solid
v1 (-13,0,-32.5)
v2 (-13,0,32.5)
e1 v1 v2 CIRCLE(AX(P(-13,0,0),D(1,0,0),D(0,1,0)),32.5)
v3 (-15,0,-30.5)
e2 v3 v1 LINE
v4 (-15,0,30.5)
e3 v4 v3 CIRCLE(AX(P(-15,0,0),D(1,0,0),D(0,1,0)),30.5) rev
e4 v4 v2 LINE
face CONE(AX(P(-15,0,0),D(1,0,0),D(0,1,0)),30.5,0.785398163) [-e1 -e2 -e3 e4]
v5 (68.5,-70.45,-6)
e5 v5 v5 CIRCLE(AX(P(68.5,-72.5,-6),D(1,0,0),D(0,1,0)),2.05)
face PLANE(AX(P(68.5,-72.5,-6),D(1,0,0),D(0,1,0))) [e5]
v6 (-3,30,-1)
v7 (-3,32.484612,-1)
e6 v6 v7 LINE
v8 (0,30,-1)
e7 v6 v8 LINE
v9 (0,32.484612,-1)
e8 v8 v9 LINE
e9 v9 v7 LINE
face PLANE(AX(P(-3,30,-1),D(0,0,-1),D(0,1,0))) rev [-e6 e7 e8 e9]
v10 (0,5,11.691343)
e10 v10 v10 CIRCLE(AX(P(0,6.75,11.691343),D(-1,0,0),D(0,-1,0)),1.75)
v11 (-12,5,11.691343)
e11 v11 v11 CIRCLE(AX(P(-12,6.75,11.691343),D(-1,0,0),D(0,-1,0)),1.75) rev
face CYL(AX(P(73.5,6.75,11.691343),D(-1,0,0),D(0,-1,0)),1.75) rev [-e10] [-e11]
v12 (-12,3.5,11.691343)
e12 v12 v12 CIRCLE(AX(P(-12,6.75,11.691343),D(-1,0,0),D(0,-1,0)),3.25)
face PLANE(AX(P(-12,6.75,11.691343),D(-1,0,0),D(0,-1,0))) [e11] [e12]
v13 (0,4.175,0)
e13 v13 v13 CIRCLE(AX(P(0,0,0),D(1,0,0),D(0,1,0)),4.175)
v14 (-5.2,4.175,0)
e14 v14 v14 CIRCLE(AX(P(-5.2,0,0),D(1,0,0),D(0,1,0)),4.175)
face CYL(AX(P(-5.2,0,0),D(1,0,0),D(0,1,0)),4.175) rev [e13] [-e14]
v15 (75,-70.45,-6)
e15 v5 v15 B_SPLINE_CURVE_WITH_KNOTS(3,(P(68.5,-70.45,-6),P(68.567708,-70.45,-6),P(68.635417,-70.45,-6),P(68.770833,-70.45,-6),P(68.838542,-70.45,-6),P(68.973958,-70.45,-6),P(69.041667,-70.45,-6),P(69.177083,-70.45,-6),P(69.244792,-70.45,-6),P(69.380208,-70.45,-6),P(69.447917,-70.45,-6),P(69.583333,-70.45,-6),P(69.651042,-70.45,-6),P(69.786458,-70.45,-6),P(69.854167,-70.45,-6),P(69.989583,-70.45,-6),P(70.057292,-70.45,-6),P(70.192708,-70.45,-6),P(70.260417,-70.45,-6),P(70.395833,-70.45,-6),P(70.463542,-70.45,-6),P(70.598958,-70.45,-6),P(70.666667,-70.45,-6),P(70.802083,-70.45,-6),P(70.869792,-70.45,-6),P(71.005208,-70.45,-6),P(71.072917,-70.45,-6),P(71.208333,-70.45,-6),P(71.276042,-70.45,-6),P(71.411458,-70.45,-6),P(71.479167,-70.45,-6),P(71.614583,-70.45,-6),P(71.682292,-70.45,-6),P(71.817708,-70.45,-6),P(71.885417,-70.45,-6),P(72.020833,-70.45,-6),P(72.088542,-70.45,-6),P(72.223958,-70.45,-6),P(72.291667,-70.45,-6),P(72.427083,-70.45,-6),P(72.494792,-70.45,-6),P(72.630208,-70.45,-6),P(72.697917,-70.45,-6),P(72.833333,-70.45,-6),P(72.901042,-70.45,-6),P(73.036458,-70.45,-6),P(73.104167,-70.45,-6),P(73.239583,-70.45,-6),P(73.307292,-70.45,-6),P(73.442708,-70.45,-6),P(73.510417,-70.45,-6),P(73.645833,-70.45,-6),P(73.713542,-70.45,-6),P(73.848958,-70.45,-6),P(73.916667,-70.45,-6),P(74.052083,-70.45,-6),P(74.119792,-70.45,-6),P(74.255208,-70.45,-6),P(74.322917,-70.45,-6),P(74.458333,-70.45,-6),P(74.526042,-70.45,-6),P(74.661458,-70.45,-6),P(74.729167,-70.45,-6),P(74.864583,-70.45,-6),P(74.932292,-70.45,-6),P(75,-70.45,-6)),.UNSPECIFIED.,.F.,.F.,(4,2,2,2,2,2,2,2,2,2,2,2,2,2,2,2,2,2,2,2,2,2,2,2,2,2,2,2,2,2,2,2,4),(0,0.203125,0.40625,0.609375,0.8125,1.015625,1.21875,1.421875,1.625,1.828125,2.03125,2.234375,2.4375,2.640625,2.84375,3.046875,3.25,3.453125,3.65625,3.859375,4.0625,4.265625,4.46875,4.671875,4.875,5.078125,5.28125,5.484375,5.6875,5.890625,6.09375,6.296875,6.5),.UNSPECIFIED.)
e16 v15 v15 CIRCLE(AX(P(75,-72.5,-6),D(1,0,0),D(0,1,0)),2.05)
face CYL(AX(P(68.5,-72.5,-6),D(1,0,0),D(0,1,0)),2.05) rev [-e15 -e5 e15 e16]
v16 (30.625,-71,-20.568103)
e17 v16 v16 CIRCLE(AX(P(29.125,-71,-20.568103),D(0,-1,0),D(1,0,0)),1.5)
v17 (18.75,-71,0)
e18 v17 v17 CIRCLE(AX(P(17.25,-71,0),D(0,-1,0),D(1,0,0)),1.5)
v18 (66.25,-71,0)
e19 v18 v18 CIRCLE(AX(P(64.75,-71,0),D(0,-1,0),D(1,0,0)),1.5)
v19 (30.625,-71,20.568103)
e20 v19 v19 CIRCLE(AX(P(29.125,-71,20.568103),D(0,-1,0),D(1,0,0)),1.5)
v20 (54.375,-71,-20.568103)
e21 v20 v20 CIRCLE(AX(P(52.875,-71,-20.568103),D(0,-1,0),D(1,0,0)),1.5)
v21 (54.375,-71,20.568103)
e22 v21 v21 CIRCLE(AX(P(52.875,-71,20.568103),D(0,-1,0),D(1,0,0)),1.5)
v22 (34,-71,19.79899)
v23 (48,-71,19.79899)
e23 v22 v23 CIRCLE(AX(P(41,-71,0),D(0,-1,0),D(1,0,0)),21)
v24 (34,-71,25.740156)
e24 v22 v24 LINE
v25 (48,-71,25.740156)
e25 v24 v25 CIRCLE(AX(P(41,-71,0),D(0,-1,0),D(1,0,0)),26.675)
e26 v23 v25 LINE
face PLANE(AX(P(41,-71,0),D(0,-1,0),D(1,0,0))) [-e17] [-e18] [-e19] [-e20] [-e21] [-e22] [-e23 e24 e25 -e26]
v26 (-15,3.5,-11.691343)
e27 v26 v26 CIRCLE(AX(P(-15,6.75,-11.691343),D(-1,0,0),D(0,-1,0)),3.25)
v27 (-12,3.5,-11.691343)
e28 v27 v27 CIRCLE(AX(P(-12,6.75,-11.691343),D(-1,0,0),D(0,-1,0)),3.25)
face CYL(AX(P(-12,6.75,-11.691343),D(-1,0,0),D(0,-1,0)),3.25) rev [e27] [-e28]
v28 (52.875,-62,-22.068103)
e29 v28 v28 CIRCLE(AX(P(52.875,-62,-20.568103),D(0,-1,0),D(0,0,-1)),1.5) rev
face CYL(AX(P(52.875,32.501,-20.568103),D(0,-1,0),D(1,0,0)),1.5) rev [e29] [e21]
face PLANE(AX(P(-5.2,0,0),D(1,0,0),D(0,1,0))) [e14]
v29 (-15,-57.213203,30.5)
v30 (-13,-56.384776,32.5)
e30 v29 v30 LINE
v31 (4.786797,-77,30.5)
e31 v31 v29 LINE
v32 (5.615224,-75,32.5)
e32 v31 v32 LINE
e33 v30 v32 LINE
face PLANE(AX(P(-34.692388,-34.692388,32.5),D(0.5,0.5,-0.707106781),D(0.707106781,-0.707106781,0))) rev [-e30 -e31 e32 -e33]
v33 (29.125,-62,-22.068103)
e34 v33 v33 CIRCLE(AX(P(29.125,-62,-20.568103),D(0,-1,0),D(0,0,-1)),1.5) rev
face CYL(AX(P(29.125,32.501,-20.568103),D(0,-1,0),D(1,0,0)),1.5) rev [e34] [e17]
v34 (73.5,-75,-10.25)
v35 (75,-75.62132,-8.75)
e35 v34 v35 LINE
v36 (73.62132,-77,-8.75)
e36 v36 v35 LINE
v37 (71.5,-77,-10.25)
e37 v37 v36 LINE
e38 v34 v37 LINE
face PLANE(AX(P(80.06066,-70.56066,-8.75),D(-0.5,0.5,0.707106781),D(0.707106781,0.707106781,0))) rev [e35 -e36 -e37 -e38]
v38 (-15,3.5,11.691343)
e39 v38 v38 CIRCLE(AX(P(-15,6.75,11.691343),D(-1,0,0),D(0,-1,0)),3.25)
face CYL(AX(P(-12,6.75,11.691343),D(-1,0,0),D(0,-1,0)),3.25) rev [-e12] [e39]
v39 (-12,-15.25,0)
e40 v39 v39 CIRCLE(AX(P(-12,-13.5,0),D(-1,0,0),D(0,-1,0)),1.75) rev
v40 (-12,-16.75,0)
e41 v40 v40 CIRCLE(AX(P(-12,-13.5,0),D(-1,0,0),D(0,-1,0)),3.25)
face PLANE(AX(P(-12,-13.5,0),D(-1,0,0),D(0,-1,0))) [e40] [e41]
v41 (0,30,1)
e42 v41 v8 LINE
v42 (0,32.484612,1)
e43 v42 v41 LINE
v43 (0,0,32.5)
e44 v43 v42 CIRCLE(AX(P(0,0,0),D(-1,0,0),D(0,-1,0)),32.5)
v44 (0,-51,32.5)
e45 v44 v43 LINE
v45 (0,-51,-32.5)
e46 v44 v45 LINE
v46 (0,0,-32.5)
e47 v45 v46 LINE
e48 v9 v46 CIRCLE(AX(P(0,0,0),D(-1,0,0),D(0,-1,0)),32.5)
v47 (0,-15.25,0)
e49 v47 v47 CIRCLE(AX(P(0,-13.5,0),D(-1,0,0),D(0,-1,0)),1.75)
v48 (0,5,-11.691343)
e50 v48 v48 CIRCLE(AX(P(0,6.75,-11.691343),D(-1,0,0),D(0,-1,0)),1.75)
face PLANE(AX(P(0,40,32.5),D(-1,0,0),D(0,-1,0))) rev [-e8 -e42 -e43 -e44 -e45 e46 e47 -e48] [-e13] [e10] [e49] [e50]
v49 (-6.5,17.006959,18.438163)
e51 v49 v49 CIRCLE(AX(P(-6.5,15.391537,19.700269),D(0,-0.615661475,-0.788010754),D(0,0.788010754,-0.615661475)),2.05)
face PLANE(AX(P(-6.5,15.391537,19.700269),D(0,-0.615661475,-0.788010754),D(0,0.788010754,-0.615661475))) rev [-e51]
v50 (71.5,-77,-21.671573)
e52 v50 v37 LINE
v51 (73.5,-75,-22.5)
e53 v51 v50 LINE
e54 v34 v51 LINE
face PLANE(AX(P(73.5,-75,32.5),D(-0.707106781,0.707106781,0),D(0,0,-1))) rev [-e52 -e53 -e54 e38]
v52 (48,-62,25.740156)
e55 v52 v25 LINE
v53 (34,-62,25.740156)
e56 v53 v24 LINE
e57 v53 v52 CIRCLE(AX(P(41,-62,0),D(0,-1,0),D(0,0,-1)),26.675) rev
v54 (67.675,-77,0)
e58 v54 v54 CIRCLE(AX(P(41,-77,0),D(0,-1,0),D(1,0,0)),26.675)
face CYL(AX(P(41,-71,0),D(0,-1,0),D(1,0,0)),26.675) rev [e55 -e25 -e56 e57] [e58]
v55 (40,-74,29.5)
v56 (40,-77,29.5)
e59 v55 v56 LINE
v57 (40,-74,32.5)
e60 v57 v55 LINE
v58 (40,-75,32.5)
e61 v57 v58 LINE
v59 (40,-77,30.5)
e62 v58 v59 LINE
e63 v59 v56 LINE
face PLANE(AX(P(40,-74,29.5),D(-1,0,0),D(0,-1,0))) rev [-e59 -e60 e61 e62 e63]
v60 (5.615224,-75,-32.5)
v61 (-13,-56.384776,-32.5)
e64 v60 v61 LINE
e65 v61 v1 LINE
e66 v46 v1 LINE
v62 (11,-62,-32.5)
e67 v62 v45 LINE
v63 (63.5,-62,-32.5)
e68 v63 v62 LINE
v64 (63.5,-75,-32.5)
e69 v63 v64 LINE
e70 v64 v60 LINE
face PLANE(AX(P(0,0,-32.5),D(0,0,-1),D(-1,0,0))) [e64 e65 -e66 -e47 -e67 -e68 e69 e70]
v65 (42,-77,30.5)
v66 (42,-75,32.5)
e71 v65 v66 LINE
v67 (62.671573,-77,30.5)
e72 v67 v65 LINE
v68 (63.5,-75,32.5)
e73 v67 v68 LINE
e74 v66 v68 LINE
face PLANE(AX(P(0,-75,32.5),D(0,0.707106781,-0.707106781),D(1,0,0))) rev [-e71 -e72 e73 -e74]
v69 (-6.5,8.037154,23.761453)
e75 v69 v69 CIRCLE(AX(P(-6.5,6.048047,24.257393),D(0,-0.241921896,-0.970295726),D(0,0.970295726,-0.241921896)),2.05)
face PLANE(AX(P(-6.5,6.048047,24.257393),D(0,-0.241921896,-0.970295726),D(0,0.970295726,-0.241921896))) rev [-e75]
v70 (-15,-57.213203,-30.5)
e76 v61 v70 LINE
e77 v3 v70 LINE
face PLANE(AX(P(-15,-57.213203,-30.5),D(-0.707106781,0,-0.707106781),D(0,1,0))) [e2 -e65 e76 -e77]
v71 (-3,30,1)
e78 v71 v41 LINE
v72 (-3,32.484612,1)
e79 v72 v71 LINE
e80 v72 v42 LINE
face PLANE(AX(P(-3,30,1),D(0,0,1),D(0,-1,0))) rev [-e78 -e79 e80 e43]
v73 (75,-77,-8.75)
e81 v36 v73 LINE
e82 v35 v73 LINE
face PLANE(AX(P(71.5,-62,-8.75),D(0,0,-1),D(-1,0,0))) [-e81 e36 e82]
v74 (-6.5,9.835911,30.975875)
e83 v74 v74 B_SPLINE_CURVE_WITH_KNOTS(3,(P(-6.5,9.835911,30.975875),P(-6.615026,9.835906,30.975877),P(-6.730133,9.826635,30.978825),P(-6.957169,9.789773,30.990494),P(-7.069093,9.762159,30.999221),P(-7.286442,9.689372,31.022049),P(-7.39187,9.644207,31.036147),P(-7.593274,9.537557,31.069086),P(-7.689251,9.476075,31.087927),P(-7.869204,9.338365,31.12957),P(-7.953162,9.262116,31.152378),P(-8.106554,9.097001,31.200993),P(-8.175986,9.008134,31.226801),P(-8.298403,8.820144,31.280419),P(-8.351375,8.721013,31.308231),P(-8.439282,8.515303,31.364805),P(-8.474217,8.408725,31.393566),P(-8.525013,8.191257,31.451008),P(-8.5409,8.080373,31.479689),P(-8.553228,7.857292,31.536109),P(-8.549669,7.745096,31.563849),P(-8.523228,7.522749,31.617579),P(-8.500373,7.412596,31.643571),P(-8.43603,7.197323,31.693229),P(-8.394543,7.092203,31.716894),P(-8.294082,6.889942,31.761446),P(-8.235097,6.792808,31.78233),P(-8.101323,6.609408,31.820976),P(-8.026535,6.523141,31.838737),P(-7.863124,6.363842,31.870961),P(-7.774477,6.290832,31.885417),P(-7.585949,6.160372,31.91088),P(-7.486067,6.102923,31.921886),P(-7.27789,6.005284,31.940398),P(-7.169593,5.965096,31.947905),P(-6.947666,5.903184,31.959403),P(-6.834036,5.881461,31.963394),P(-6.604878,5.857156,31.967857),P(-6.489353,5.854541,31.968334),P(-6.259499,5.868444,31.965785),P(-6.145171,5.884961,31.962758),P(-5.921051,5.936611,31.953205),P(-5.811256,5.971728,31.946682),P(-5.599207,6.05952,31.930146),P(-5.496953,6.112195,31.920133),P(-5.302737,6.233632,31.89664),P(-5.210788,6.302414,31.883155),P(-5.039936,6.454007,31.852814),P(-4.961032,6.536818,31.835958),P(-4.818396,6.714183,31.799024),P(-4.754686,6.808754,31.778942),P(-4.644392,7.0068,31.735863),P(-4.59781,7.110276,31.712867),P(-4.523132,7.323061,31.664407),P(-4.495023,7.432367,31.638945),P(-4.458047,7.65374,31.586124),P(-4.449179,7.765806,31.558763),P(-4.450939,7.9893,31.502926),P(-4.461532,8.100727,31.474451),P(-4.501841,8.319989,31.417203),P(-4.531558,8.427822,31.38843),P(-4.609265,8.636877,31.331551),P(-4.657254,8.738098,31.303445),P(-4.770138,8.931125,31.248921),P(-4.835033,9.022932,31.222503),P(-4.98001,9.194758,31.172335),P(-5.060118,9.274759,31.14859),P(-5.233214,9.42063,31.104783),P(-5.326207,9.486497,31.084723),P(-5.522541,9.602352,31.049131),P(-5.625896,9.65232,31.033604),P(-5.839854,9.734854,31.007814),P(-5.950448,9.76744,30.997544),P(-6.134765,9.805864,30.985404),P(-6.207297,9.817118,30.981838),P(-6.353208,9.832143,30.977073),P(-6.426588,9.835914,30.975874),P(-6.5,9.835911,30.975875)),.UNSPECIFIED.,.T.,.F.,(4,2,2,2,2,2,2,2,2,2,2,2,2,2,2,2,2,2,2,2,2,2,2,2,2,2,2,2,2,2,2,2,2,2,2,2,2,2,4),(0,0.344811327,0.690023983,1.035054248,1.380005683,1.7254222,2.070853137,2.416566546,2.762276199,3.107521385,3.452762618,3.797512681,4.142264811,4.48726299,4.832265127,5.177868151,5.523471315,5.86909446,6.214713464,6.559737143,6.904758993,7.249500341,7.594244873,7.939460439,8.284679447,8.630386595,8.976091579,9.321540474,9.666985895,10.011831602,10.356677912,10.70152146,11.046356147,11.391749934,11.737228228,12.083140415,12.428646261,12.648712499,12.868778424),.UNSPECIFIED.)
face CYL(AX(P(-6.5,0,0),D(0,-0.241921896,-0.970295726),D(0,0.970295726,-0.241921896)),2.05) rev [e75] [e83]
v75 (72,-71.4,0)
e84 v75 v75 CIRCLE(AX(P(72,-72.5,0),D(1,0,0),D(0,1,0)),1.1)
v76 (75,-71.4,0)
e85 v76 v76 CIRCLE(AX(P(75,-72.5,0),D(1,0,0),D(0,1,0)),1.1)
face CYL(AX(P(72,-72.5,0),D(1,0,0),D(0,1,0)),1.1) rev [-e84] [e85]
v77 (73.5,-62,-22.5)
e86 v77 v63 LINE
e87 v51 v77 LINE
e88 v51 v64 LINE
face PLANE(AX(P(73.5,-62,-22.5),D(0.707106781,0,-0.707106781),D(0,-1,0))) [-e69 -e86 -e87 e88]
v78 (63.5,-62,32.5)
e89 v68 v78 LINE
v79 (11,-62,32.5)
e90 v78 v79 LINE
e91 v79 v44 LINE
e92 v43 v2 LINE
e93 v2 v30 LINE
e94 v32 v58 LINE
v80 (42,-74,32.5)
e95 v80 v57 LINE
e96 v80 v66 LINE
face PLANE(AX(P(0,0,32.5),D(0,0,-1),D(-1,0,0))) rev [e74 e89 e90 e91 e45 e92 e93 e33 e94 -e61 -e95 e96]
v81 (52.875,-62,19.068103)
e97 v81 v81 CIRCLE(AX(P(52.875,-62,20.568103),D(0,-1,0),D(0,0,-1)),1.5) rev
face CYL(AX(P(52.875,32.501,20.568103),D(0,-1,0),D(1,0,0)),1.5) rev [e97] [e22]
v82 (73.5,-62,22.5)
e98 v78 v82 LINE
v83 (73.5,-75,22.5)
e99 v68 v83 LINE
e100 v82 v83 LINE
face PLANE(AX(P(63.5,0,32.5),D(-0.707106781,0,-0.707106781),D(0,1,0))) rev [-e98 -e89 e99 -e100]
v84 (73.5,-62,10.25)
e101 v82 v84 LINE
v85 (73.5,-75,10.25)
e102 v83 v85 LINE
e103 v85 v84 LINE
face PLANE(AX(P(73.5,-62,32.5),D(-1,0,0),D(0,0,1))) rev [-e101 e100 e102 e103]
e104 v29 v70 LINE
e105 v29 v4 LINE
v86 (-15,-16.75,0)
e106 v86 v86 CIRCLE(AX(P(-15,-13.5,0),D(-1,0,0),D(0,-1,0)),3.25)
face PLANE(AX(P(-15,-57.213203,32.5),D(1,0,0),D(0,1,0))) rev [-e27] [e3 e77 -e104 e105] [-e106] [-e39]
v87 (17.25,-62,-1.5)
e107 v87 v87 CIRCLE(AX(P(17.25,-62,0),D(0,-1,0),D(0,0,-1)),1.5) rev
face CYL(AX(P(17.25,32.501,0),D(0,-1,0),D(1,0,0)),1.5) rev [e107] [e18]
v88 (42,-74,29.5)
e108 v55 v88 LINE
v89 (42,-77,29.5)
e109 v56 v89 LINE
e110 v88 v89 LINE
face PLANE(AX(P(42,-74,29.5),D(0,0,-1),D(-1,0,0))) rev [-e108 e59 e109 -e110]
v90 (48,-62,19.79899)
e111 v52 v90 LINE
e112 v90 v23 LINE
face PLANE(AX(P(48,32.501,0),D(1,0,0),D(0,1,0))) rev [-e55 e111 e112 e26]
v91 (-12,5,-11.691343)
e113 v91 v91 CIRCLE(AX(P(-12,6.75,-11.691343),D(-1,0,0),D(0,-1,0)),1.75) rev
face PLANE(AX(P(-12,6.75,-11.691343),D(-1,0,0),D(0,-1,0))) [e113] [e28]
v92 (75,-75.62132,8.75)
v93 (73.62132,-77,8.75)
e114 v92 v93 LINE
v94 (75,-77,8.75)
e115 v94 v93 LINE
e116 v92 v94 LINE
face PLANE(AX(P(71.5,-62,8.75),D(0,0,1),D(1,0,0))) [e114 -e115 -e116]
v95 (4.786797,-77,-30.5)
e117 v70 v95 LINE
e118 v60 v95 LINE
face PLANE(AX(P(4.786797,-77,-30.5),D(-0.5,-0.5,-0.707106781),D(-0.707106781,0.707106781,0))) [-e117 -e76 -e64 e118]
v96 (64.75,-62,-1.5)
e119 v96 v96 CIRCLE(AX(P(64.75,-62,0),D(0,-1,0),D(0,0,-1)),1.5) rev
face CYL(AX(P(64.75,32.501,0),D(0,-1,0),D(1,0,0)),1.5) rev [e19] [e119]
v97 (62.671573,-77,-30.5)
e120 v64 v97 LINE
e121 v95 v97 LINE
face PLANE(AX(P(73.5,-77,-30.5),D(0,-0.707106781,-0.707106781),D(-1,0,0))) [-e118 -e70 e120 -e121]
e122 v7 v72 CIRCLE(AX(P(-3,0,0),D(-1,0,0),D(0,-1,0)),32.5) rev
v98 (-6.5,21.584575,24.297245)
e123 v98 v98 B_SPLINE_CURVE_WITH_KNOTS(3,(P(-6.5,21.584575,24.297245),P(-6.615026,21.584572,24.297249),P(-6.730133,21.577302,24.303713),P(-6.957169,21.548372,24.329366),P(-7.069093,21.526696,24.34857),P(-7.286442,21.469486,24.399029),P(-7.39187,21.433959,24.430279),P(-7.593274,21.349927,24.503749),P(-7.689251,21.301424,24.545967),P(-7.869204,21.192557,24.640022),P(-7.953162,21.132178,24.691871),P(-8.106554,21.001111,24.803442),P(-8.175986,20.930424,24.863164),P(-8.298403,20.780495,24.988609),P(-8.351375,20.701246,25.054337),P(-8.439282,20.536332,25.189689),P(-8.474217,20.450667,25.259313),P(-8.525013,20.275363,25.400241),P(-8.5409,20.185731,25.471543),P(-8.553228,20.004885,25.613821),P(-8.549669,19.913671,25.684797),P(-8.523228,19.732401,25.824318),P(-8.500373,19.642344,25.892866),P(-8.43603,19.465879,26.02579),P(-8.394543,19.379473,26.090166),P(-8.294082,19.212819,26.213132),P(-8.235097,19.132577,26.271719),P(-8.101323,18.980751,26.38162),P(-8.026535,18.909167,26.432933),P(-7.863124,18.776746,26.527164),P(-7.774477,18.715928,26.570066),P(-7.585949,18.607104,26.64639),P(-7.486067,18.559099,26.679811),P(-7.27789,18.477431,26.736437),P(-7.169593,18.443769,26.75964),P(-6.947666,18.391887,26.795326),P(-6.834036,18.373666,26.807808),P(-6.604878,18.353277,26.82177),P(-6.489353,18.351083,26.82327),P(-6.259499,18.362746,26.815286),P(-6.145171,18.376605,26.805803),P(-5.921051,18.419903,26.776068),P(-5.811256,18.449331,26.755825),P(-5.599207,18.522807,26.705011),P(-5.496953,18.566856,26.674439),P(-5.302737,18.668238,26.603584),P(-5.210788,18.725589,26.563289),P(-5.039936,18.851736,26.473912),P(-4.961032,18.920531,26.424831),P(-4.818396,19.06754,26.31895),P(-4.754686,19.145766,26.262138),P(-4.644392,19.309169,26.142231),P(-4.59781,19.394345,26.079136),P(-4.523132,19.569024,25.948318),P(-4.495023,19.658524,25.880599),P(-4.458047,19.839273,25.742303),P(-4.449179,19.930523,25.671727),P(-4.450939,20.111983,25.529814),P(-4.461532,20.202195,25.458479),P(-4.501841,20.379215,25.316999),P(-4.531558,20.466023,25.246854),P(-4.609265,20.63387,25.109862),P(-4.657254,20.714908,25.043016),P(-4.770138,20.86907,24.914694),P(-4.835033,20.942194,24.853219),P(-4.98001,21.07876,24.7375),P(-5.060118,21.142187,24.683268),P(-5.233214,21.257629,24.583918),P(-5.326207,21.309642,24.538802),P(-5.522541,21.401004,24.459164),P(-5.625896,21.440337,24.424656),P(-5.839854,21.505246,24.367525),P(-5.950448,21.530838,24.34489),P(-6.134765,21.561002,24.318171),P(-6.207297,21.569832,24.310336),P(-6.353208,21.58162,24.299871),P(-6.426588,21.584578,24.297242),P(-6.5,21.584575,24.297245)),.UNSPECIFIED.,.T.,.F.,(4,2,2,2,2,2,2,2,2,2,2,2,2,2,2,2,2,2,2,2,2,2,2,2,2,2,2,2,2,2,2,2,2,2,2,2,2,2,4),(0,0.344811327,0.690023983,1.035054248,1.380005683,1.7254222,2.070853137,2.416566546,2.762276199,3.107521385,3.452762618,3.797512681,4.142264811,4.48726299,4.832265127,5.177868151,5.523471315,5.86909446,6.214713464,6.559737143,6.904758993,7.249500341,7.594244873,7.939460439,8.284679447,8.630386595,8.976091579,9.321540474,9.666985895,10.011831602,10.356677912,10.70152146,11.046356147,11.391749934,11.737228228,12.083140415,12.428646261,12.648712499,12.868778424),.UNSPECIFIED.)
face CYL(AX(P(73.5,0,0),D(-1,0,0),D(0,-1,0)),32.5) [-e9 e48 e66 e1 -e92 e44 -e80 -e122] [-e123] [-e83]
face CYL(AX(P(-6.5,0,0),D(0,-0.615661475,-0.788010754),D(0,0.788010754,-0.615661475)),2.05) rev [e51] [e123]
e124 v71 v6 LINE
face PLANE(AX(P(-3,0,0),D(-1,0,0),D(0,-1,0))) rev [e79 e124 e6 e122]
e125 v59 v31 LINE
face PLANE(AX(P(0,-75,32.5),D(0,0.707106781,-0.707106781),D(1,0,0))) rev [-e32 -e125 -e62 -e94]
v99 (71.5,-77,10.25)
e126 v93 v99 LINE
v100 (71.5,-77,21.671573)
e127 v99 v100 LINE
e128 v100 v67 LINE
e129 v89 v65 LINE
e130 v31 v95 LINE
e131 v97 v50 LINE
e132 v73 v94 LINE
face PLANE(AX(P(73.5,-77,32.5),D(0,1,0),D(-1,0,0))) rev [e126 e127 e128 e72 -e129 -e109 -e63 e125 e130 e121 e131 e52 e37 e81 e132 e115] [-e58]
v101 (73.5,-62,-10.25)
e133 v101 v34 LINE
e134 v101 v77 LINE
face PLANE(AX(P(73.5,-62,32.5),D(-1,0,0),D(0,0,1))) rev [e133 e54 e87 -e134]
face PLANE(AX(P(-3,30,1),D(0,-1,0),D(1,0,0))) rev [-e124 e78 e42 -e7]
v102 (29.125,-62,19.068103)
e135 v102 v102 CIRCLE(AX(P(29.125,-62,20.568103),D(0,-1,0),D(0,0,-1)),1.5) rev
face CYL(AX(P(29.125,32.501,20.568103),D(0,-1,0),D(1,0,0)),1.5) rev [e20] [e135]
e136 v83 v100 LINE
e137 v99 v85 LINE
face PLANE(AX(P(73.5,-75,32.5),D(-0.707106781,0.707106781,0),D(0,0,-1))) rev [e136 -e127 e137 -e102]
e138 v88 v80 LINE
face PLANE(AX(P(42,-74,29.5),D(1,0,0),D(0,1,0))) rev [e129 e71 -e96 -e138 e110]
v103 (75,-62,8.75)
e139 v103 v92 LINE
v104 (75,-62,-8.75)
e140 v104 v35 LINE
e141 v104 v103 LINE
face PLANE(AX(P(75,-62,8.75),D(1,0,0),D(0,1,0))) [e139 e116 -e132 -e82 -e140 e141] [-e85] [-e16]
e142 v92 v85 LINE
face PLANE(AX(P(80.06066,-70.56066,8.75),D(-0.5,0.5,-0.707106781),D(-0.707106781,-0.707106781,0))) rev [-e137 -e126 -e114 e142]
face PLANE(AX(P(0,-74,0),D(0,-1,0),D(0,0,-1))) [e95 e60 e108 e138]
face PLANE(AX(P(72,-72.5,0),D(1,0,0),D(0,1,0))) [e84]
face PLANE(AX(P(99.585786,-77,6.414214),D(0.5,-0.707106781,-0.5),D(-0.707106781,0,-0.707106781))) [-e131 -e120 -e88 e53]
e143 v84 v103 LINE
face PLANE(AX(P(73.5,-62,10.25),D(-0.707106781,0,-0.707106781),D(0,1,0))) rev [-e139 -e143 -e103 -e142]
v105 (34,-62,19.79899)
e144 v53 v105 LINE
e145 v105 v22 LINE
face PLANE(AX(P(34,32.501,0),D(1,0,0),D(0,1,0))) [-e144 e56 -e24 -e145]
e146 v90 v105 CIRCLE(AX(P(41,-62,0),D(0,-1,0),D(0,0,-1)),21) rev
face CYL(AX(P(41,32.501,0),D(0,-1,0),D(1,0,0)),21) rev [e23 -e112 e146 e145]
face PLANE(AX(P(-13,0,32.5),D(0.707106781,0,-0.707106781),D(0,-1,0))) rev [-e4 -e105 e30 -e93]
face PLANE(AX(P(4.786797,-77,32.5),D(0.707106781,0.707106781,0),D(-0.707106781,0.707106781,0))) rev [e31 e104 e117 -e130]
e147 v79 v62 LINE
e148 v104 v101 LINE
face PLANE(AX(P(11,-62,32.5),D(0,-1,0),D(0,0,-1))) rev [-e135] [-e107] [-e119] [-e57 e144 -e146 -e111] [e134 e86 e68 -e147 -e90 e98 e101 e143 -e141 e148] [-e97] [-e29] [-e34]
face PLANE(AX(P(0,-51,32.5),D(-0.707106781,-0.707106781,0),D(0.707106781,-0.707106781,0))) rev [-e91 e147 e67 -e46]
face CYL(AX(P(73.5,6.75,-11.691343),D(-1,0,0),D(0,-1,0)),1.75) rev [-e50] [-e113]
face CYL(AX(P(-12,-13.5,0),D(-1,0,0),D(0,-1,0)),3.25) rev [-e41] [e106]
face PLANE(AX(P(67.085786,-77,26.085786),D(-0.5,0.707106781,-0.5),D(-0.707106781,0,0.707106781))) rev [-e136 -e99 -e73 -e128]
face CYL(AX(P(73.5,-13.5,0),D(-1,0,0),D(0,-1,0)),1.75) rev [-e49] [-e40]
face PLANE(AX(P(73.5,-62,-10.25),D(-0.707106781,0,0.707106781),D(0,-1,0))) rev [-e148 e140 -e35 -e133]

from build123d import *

# Parameters (mm, degrees)
EXTRUDE_1_DEPTH          = 32.5
SKETCH_2_R               = 1.75
CUT_EXTRUDE_1_DEPTH      = 122.727153914
SKETCH_3_R               = 26.675
CUT_EXTRUDE_2_DEPTH      = 6
CUT_EXTRUDE_3_REACH      = 133.037
SKETCH_4_R               = 1.5
SKETCH_4_R_2             = 21
SKETCH_5_R               = 4.175
CUT_EXTRUDE_4_DEPTH      = 5.2
CHAMFER_1_SIZE           = 10
CUT_EXTRUDE_START        = -9
CUT_EXTRUDE_5_DEPTH      = 9
SKETCH_7_R               = 3.25
CUT_EXTRUDE_6_DEPTH      = 3
CHAMFER_2_SIZE           = 2
PATTERN_CIRCULAR_1_COUNT = 2
PATTERN_CIRCULAR_1_ANGLE = 24
SKETCH_10_W              = 2
SKETCH_10_H              = 3
CUT_EXTRUDE_7_DEPTH      = 3
SKETCH_11_W              = 3.5
SKETCH_11_H              = 17.5
EXTRUDE_2_DEPTH          = 15
CHAMFER_3_SIZE           = 1.5
SKETCH_12_R              = 1.1
CUT_EXTRUDE_8_DEPTH      = 3
SKETCH_13_R              = 2.05
CUT_EXTRUDE_9_DEPTH      = 6.5
SKETCH_14_W              = 2
SKETCH_14_H              = 3
CUT_EXTRUDE_10_DEPTH     = 3


with BuildPart() as part:
    # Эскиз1 → Бобышка-Вытянуть1 (new, symmetric)
    with BuildSketch(Plane.XY):
        Polygon((0, 40), (0, -51), (11, -62), (73.5, -62), (73.5, -77), (4.786796564, -77), (-15, -57.213203436), (-15, 40), align=None)
    extrude(amount=EXTRUDE_1_DEPTH, both=True)

    # Эскиз2 → Вырез-Вытянуть1 (cut, through all)
    with BuildSketch(Plane.ZY.offset(15)):
        with BuildLine():
            Line((32.5, 0), (32.5, 40))
            Line((32.5, 40), (-32.5, 40))
            Line((-32.5, 40), (-32.5, 0))
            ThreePointArc((-32.5, 0), (0, 32.5), (32.5, 0))
        make_face()
        with Locations(Location((0, -13.5, 0), (0, 0, 270))):
            Circle(SKETCH_2_R)
        with Locations(Location((11.691342951, 6.75, 0), (0, 0, 270))):
            Circle(SKETCH_2_R)
        with Locations(Location((-11.691342951, 6.75, 0), (0, 0, 270))):
            Circle(SKETCH_2_R)
    extrude(amount=-CUT_EXTRUDE_1_DEPTH, mode=Mode.SUBTRACT)

    # Эскиз3 → Вырез-Вытянуть2 (cut)
    with BuildSketch(Plane.XZ.offset(77)):
        with Locations((41, 0)):
            Circle(SKETCH_3_R)
    extrude(amount=-CUT_EXTRUDE_2_DEPTH, mode=Mode.SUBTRACT)

    # Эскиз4 → Вырез-Вытянуть3 (cut, up to next)
    with BuildSketch(Plane.XZ.offset(71), mode=Mode.PRIVATE) as cut_extrude_3_sk1:
        with Locations((64.75, 0)):
            Circle(SKETCH_4_R)
    cut_extrude_3_tool1 = extrude(cut_extrude_3_sk1.sketch, amount=-CUT_EXTRUDE_3_REACH, mode=Mode.PRIVATE) & part.part
    # Эскиз4 → Вырез-Вытянуть3 (cut, up to next)
    with BuildSketch(Plane.XZ.offset(71), mode=Mode.PRIVATE) as cut_extrude_3_sk2:
        with Locations((52.875, -20.56810334)):
            Circle(SKETCH_4_R)
    cut_extrude_3_tool2 = extrude(cut_extrude_3_sk2.sketch, amount=-CUT_EXTRUDE_3_REACH, mode=Mode.PRIVATE) & part.part
    # Эскиз4 → Вырез-Вытянуть3 (cut, up to next)
    with BuildSketch(Plane.XZ.offset(71), mode=Mode.PRIVATE) as cut_extrude_3_sk3:
        with Locations((29.125, -20.56810334)):
            Circle(SKETCH_4_R)
    cut_extrude_3_tool3 = extrude(cut_extrude_3_sk3.sketch, amount=-CUT_EXTRUDE_3_REACH, mode=Mode.PRIVATE) & part.part
    # Эскиз4 → Вырез-Вытянуть3 (cut, up to next)
    with BuildSketch(Plane.XZ.offset(71), mode=Mode.PRIVATE) as cut_extrude_3_sk4:
        with Locations((17.25, 0)):
            Circle(SKETCH_4_R)
    cut_extrude_3_tool4 = extrude(cut_extrude_3_sk4.sketch, amount=-CUT_EXTRUDE_3_REACH, mode=Mode.PRIVATE) & part.part
    # Эскиз4 → Вырез-Вытянуть3 (cut, up to next)
    with BuildSketch(Plane.XZ.offset(71), mode=Mode.PRIVATE) as cut_extrude_3_sk5:
        with Locations((29.125, 20.56810334)):
            Circle(SKETCH_4_R)
    cut_extrude_3_tool5 = extrude(cut_extrude_3_sk5.sketch, amount=-CUT_EXTRUDE_3_REACH, mode=Mode.PRIVATE) & part.part
    # Эскиз4 → Вырез-Вытянуть3 (cut, up to next)
    with BuildSketch(Plane.XZ.offset(71), mode=Mode.PRIVATE) as cut_extrude_3_sk6:
        with Locations((52.875, 20.56810334)):
            Circle(SKETCH_4_R)
    cut_extrude_3_tool6 = extrude(cut_extrude_3_sk6.sketch, amount=-CUT_EXTRUDE_3_REACH, mode=Mode.PRIVATE) & part.part
    # Эскиз4 → Вырез-Вытянуть3 (cut, up to next)
    with BuildSketch(Plane.XZ.offset(71), mode=Mode.PRIVATE) as cut_extrude_3_sk7:
        with Locations((41, 0)):
            Circle(SKETCH_4_R_2)
    cut_extrude_3_tool7 = extrude(cut_extrude_3_sk7.sketch, amount=-CUT_EXTRUDE_3_REACH, mode=Mode.PRIVATE) & part.part
    add(cut_extrude_3_tool1.solids().sort_by_distance((64.75, -71, 0))[0], mode=Mode.SUBTRACT)
    add(cut_extrude_3_tool2.solids().sort_by_distance((52.875, -71, -20.568103))[0], mode=Mode.SUBTRACT)
    add(cut_extrude_3_tool3.solids().sort_by_distance((29.125, -71, -20.568103))[0], mode=Mode.SUBTRACT)
    add(cut_extrude_3_tool4.solids().sort_by_distance((17.25, -71, 0))[0], mode=Mode.SUBTRACT)
    add(cut_extrude_3_tool5.solids().sort_by_distance((29.125, -71, 20.568103))[0], mode=Mode.SUBTRACT)
    add(cut_extrude_3_tool6.solids().sort_by_distance((52.875, -71, 20.568103))[0], mode=Mode.SUBTRACT)
    add(cut_extrude_3_tool7.solids().sort_by_distance((41, -71, 0))[0], mode=Mode.SUBTRACT)

    # Эскиз5 → Вырез-Вытянуть4 (cut)
    with BuildSketch(Plane(origin=(0, 0, 0), x_dir=(0, 0, -1), z_dir=(1, 0, 0))):
        with Locations(Location((0, 0, 0), (0, 0, 90))):
            Circle(SKETCH_5_R)
    extrude(amount=-CUT_EXTRUDE_4_DEPTH, mode=Mode.SUBTRACT)

    # Фаска1
    chamfer_1_edges = [part.edges().sort_by_distance(p)[0] for p in [
        (73.5, -69.5, 32.5),
        (73.5, -69.5, -32.5),
    ]]
    chamfer(chamfer_1_edges, length=CHAMFER_1_SIZE)

    # Эскиз6 → Вырез-Вытянуть5 (cut)
    with BuildSketch(Plane.XZ.offset(71).offset(CUT_EXTRUDE_START)):
        with BuildLine():
            ThreePointArc((34, 19.798989873), (41, 21), (48, 19.798989873))
            Line((48, 19.798989873), (48, 25.740155885))
            ThreePointArc((48, 25.740155885), (41, 26.675), (34, 25.740155885))
            Line((34, 25.740155885), (34, 19.798989873))
        make_face()
    extrude(amount=CUT_EXTRUDE_5_DEPTH, mode=Mode.SUBTRACT)

    # Эскиз7 → Вырез-Вытянуть6 (cut)
    with BuildSketch(Plane.ZY.offset(15)):
        with Locations(Location((11.691342951, 6.75, 0), (0, 0, 270))):
            Circle(SKETCH_7_R)
        with Locations(Location((0, -13.5, 0), (0, 0, 270))):
            Circle(SKETCH_7_R)
        with Locations(Location((-11.691342951, 6.75, 0), (0, 0, 270))):
            Circle(SKETCH_7_R)
    extrude(amount=-CUT_EXTRUDE_6_DEPTH, mode=Mode.SUBTRACT)

    # Фаска2
    chamfer_2_edges = [part.edges().sort_by_distance(p)[0] for p in [
        (73.5, -77, 0),
        (34.143398282, -77, -32.5),
        (68.5, -77, 27.5),
        (68.5, -77, -27.5),
        (-5.106601718, -67.106601718, -32.5),
        (-5.106601718, -67.106601718, 32.5),
        (34.143398282, -77, 32.5),
        (-15, -28.606601718, -32.5),
        (-15, -28.606601718, 32.5),
        (-15, 32.5, 0),
    ]]
    chamfer(chamfer_2_edges, length=CHAMFER_2_SIZE)

    # Эскиз9 → Вырез-Повернуть1 (revolve, cut)
    with BuildSketch(Plane(origin=(-6.5, 0, 0), x_dir=(0, 0, -1), z_dir=(1, 0, 0))):
        Polygon((-19.70026884, 15.391536883), (-18.438162816, 17.006958928), (-24.742248845, 21.932250731), (-26.004354869, 20.316828686), align=None)
    cut_revolve_1 = revolve(axis=Axis((-6.5, 0, 0), (0, 0.6156614753256564, 0.7880107536067235)), mode=Mode.SUBTRACT)

    # Круговой массив1: Вырез-Повернуть1 ×2 about axis
    pattern_circular_1_axis = Axis((73.5, 0, 0), (1, 0, 0))
    for i in range(1, PATTERN_CIRCULAR_1_COUNT):
        add(cut_revolve_1.rotate(pattern_circular_1_axis, i * PATTERN_CIRCULAR_1_ANGLE / (PATTERN_CIRCULAR_1_COUNT - 1)), mode=Mode.SUBTRACT)

    # Эскиз10 → Вырез-Вытянуть7 (cut)
    with BuildSketch(Plane(origin=(0, 0, 0), x_dir=(0, 0, -1), z_dir=(1, 0, 0))):
        with Locations((0, 31.5)):
            Rectangle(SKETCH_10_W, SKETCH_10_H)
    extrude(amount=-CUT_EXTRUDE_7_DEPTH, mode=Mode.SUBTRACT)

    # Эскиз11 → Бобышка-Вытянуть2 (add)
    with BuildSketch(Plane.XZ.offset(77)):
        with Locations((73.25, 0)):
            Rectangle(SKETCH_11_W, SKETCH_11_H)
    extrude(amount=-EXTRUDE_2_DEPTH)

    # Фаска3
    chamfer_3_edges = [part.edges().sort_by_distance(p)[0] for p in [
        (72.5, -76, -8.75),
        (73.5, -68.5, -8.75),
        (72.5, -76, 8.75),
        (73.5, -68.5, 8.75),
    ]]
    chamfer(chamfer_3_edges, length=CHAMFER_3_SIZE - 0.0001)  # a hair under: the kernel refuses the full size

    # Эскиз12 → Вырез-Вытянуть8 (cut)
    with BuildSketch(Plane(origin=(75, 0, 0), x_dir=(0, 0, -1), z_dir=(1, 0, 0))):
        with Locations(Location((0, -72.5, 0), (0, 0, 90))):
            Circle(SKETCH_12_R)
    extrude(amount=-CUT_EXTRUDE_8_DEPTH, mode=Mode.SUBTRACT)

    # Эскиз13 → Вырез-Вытянуть9 (cut)
    with BuildSketch(Plane(origin=(75, 0, 0), x_dir=(0, 0, -1), z_dir=(1, 0, 0))):
        with Locations(Location((6, -72.5, 0), (0, 0, 90))):
            Circle(SKETCH_13_R)
    extrude(amount=-CUT_EXTRUDE_9_DEPTH, mode=Mode.SUBTRACT)

    # Эскиз14 → Вырез-Вытянуть10 (cut)
    with BuildSketch(Plane.XZ.offset(77)):
        with Locations((41, 31)):
            Rectangle(SKETCH_14_W, SKETCH_14_H)
    extrude(amount=-CUT_EXTRUDE_10_DEPTH, mode=Mode.SUBTRACT)


solid = part.part
